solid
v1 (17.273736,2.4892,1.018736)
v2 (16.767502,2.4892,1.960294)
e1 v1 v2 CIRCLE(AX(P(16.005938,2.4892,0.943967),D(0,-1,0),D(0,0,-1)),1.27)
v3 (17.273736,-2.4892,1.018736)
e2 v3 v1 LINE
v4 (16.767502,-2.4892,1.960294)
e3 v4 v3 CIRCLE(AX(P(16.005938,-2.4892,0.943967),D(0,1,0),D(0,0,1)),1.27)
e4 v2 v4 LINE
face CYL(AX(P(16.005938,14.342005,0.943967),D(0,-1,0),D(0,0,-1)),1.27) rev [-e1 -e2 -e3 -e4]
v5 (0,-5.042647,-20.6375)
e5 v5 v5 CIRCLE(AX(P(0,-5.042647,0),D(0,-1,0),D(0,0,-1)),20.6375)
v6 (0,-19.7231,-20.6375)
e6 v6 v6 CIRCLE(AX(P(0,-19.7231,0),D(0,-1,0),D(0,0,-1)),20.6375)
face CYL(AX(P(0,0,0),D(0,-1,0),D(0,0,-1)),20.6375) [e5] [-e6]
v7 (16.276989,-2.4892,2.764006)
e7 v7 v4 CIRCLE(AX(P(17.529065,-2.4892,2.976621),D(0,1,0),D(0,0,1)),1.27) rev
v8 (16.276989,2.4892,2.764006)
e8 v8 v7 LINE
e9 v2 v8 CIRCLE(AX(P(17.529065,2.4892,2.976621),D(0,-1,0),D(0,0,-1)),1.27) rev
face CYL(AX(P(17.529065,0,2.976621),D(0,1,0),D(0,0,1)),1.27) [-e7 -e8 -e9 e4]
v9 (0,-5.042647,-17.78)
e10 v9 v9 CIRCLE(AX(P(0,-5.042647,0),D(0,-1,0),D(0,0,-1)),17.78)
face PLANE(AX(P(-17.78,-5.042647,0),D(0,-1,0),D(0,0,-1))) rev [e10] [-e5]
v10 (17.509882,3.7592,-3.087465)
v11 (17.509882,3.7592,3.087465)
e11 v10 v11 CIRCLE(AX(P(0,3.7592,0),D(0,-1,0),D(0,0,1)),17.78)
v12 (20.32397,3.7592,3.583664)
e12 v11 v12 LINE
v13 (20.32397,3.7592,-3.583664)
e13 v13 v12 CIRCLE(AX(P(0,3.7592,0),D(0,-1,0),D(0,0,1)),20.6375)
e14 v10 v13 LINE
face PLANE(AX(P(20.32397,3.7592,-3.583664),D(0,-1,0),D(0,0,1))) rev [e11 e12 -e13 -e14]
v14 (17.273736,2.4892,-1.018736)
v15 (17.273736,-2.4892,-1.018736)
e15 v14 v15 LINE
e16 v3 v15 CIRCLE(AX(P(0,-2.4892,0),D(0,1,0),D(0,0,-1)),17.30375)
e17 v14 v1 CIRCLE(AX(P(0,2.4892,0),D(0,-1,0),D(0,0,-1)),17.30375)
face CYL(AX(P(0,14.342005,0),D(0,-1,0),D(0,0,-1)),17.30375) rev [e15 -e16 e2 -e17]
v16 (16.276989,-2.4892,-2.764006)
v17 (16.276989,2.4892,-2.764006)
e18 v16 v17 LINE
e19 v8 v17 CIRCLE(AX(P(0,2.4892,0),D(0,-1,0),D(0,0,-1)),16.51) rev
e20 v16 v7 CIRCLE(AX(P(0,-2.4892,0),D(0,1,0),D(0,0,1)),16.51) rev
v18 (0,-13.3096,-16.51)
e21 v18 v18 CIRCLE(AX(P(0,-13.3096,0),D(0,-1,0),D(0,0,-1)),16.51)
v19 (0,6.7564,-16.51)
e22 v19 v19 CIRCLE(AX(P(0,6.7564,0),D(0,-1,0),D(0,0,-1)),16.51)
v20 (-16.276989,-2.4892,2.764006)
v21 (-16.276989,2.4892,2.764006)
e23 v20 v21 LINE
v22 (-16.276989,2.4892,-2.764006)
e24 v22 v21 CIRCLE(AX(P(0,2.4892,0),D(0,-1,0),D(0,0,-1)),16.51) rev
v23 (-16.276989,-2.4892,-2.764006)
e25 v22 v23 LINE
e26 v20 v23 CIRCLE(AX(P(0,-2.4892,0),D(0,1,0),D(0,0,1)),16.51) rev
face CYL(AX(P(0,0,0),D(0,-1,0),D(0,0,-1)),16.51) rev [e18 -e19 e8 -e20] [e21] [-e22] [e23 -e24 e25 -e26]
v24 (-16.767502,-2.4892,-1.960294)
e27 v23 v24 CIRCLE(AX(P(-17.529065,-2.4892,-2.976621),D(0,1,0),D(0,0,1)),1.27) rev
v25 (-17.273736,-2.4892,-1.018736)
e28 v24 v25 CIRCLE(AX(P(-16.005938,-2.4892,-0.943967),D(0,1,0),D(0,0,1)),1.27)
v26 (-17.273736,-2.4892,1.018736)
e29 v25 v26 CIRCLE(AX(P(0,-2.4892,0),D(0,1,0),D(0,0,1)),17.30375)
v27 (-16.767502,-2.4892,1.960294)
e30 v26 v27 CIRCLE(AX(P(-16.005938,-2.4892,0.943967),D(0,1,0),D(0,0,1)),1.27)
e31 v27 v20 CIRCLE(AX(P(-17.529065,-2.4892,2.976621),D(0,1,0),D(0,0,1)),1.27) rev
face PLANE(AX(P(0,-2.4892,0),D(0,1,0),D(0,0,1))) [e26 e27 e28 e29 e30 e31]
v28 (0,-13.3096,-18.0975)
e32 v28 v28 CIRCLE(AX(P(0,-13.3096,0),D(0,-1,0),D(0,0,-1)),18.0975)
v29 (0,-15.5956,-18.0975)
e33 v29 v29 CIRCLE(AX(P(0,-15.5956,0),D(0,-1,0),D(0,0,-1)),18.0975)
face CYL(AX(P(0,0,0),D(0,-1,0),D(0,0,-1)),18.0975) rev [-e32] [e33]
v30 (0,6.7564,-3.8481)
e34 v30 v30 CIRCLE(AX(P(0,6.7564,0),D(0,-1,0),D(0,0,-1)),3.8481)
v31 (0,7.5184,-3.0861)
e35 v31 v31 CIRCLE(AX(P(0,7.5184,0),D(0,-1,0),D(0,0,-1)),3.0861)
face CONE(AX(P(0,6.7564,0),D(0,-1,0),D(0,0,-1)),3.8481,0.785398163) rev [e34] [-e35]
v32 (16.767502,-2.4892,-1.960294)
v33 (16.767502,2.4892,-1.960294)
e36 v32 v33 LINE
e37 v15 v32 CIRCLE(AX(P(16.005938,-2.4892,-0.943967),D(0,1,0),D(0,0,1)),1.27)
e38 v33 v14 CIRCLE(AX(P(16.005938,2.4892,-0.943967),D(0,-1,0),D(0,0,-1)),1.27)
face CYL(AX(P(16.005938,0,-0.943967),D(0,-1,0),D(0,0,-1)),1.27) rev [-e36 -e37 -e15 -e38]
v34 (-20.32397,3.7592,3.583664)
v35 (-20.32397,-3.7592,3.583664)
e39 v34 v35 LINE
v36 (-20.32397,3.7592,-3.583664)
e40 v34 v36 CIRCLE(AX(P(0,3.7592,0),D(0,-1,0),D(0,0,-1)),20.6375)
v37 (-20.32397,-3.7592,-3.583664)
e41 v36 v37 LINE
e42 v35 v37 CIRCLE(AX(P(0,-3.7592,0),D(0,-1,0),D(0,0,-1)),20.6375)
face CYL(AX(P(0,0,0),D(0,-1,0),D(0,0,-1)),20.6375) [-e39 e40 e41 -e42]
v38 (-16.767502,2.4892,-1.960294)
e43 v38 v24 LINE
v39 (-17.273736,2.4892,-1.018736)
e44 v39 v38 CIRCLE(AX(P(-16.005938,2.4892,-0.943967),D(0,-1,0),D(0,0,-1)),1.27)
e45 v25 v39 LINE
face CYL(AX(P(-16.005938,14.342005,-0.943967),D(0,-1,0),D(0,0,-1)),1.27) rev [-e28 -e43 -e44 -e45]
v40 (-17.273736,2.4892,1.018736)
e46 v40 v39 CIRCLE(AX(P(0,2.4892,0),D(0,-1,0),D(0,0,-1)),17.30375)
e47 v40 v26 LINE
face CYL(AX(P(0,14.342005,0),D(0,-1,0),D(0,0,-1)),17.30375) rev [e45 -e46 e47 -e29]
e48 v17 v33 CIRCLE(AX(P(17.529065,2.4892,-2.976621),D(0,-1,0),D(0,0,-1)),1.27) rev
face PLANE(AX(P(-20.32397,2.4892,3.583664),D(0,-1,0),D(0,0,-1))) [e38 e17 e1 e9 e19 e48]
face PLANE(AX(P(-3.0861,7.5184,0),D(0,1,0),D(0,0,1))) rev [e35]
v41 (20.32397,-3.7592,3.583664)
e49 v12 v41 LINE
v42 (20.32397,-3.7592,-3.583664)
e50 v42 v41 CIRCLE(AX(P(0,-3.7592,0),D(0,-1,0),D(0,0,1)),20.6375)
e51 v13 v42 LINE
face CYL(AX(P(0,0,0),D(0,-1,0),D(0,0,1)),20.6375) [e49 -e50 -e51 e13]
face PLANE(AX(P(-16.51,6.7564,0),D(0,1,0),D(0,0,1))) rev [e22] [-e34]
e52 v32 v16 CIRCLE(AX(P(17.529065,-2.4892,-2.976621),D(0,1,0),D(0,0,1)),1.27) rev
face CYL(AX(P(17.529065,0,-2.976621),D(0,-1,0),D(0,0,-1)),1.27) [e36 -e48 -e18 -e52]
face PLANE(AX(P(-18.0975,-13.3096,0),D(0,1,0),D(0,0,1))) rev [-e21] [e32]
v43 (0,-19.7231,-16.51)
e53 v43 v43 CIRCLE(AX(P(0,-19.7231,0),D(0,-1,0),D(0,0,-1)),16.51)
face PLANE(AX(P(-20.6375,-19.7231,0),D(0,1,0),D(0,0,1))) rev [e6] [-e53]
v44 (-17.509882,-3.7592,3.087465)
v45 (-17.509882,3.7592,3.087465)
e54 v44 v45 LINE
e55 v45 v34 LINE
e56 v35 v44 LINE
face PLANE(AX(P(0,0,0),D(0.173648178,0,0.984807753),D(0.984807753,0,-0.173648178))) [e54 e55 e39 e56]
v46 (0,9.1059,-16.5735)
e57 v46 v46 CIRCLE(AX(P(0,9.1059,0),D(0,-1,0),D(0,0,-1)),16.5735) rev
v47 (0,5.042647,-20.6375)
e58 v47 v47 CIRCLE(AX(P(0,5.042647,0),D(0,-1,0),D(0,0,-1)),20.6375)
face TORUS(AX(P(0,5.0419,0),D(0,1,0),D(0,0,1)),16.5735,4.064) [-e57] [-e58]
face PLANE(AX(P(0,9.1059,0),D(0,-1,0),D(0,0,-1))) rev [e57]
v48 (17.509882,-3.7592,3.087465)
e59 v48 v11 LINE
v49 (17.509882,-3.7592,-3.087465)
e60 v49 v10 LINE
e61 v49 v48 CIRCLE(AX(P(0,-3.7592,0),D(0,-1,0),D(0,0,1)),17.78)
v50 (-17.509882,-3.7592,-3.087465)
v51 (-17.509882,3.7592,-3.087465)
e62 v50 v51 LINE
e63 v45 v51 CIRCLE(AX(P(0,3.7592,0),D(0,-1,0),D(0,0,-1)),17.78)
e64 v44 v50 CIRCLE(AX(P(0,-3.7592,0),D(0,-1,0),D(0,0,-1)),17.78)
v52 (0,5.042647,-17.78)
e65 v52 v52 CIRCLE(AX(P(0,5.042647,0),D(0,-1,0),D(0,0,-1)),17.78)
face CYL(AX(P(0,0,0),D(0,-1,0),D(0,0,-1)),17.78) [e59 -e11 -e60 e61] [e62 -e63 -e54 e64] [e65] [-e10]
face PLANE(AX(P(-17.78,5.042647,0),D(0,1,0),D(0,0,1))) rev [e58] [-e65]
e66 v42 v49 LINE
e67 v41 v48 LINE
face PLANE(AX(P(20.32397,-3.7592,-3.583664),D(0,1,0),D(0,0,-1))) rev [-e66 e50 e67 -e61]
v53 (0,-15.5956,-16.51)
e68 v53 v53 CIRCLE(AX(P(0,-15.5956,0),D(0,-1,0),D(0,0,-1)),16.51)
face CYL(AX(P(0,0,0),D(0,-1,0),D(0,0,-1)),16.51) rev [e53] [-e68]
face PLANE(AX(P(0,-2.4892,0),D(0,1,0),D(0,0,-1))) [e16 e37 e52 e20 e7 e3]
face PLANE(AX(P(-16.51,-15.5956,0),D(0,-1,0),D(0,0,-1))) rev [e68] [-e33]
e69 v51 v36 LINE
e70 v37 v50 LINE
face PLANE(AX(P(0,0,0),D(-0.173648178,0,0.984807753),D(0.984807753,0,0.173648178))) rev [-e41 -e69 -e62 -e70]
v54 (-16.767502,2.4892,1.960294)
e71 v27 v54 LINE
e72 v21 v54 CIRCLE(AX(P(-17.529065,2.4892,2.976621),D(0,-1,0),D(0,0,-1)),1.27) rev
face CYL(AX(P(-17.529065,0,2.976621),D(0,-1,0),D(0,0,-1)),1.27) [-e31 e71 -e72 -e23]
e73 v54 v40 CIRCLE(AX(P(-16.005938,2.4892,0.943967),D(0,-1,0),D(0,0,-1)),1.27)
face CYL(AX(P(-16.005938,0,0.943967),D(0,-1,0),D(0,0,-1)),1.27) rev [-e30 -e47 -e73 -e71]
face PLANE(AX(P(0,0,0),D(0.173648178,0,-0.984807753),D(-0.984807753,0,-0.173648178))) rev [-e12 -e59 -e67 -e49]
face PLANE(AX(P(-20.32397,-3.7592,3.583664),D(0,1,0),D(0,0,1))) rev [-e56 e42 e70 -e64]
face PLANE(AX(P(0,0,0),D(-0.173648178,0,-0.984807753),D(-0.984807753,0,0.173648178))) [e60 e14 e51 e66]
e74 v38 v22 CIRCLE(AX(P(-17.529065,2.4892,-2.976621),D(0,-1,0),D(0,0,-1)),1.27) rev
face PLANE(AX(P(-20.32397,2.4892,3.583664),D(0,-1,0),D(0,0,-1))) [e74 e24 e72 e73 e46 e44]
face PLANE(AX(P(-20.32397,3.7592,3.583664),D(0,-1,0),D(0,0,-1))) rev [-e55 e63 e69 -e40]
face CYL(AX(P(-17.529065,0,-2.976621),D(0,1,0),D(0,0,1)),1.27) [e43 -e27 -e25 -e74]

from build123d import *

# Parameters (mm, degrees)
FILLET1_R          = 4.064
SKETCH10_W         = 2.857500069
SKETCH10_H         = 7.5184
REVOLVE3_ANGLE     = 20
CUT_EXTRUDE1_START = 1.27
CUT_EXTRUDE1_DEPTH = 4.9784
CIRPATTERN4_COUNT  = 2
FILLET8_R          = 1.27
FILLET9_R          = 1.27


with BuildPart() as part:
    # Sketch1 → Revolve1 (revolve)
    with BuildSketch(Plane.XY, mode=Mode.PRIVATE) as revolve1_sk:
        Polygon((0, 9.1059), (-20.6375, 9.1059), (-20.6375, 5.042647059), (-17.78, 5.042647059), (-17.78, -5.042647059), (-20.6375, -5.042647059), (-20.6375, -19.7231), (-16.51, -19.7231), (-16.51, -15.5956), (-18.0975, -15.5956), (-18.0975, -13.3096), (-16.51, -13.3096), (-16.51, 6.7564), (-3.8481, 6.7564), (-3.0861, 7.5184), (0, 7.5184), align=None)
    revolve(revolve1_sk.sketch.rotate(Axis((0, 0, 0), (0, 1, 0)), 270), axis=Axis((0, 0, 0), (0, 1, 0)))

    # Fillet1
    # the kernel refuses this fillet: 4.064 mm, written as the material it takes off along each edge
    with BuildSketch(Plane(origin=(0, 9.1059, 0), x_dir=(0, 0, -1), z_dir=(1, 0, 0))) as fillet1_piece_1:
        with BuildLine():
            CenterArc((16.573500069, -4.064), FILLET1_R, 0.010532312, 89.989467688)
            Line((20.6375, -4.063252941), (20.718779999, -4.063238))
            Line((20.718779999, -4.063238), (20.71878, 0))
            Line((20.71878, 0), (20.6375, 0.08128))
            Line((20.6375, 0.08128), (16.573500069, 0.08128))
            Line((16.573500069, 0.08128), (16.573500069, 0))
        make_face()
    revolve(axis=Axis((0, 9.1059, 0), (0, 1, 0)), mode=Mode.SUBTRACT)

    # Sketch10 → Revolve3 (revolve, symmetric)
    with BuildSketch(Plane.XY) as revolve3_sk:
        with Locations((-19.208750034, 0)):
            Rectangle(SKETCH10_W, SKETCH10_H)
    revolve3 = revolve(axis=Axis((0, 0, 0), (0, 1, 0)), revolution_arc=REVOLVE3_ANGLE / 2)
    revolve3 = revolve3 + revolve(revolve3_sk.sketch, axis=Axis((0, 0, 0), (0, -1, 0)), revolution_arc=REVOLVE3_ANGLE / 2)

    # Sketch12 → Cut-Extrude1 (cut)
    with BuildSketch(Plane(origin=(0, -3.7592, 0), x_dir=(1, 0, 0), z_dir=(0, 1, 0)).offset(CUT_EXTRUDE1_START)):
        with BuildLine():
            Line((-7.313638514, 0), (-17.215440903, 1.745954919))
            ThreePointArc((-17.215440903, 1.745954919), (-17.30375, 0), (-17.215440903, -1.745954919))
            Line((-17.215440903, -1.745954919), (-7.313638514, 0))
        make_face()
    cut_extrude1 = extrude(amount=CUT_EXTRUDE1_DEPTH, mode=Mode.SUBTRACT)

    # CirPattern4: Revolve3, Cut-Extrude1 ×2 about axis
    cirpattern4_axis = Axis((0, 0, 0), (0, 1, 0))
    add([revolve3.rotate(cirpattern4_axis, i * 360 / CIRPATTERN4_COUNT) for i in range(1, CIRPATTERN4_COUNT)])
    add([cut_extrude1.rotate(cirpattern4_axis, i * 360 / CIRPATTERN4_COUNT) for i in range(1, CIRPATTERN4_COUNT)], mode=Mode.SUBTRACT)

    # Fillet8
    # the kernel refuses this fillet: 1.27 mm, written as the material it takes off along each edge
    with BuildSketch(Plane(origin=(-16.431533746, -2.4892, -1.607730937), x_dir=(0.1324793231915166, 0, -0.9911857691304479), z_dir=(0, 1, 0)), Plane(origin=(16.431533746, -2.4892, 1.607730937), x_dir=(-0.13247932319151873, 0, 0.9911857691304475), z_dir=(0, 1, 0))) as fillet8_piece_1:
        with BuildLine():
            CenterArc((1.211424462, 1.269207194), FILLET8_R, 201.909884157, 66.065503548)
            Line((0.033154154, 0.795309438), (0.009588748, 0.785831483))
            ThreePointArc((0.009588748, 0.785831483), (-0.008800881, 0.398712653), (-0.025377958, 0.001057934))
            Line((-0.025377958, 0.001057934), (0.000897351, -0.025384144))
            ThreePointArc((0.000897351, -0.025384144), (0.583278445, -0.01509352), (1.165659538, -0.025384144))
            Line((1.165659538, -0.025384144), (1.166556889, 0))
        make_face()
    extrude(amount=4.9784, mode=Mode.SUBTRACT)
    with BuildSketch(Plane(origin=(-16.431533746, -2.4892, 1.607730937), x_dir=(0.13247932319152245, 0, 0.9911857691304472), z_dir=(0, 1, 0)), Plane(origin=(16.431533746, -2.4892, -1.607730937), x_dir=(-0.13247932319151992, 0, -0.9911857691304475), z_dir=(0, 1, 0))) as fillet8_piece_2:
        with BuildLine():
            CenterArc((1.211424462, -1.269207194), FILLET8_R, 92.024612295, 66.065503548)
            Line((0.033154154, -0.795309438), (0.009588748, -0.785831483))
            ThreePointArc((0.009588748, -0.785831483), (-0.008800881, -0.398712653), (-0.025377958, -0.001057934))
            Line((-0.025377958, -0.001057934), (0.000897351, 0.025384144))
            ThreePointArc((0.000897351, 0.025384144), (0.583278445, 0.01509352), (1.165659538, 0.025384144))
            Line((1.165659538, 0.025384144), (1.166556889, 0))
        make_face()
    extrude(amount=4.9784, mode=Mode.SUBTRACT)

    # Fillet9
    fillet9_edges = [part.edges().sort_by_distance(p)[0] for p in [
        (-17.215440903, 0, 1.745954919),
        (-17.215440903, 0, -1.745954919),
        (17.215440903, 0, -1.745954919),
        (17.215440903, 0, 1.745954919),
    ]]
    fillet(fillet9_edges, radius=FILLET9_R)


solid = part.part
